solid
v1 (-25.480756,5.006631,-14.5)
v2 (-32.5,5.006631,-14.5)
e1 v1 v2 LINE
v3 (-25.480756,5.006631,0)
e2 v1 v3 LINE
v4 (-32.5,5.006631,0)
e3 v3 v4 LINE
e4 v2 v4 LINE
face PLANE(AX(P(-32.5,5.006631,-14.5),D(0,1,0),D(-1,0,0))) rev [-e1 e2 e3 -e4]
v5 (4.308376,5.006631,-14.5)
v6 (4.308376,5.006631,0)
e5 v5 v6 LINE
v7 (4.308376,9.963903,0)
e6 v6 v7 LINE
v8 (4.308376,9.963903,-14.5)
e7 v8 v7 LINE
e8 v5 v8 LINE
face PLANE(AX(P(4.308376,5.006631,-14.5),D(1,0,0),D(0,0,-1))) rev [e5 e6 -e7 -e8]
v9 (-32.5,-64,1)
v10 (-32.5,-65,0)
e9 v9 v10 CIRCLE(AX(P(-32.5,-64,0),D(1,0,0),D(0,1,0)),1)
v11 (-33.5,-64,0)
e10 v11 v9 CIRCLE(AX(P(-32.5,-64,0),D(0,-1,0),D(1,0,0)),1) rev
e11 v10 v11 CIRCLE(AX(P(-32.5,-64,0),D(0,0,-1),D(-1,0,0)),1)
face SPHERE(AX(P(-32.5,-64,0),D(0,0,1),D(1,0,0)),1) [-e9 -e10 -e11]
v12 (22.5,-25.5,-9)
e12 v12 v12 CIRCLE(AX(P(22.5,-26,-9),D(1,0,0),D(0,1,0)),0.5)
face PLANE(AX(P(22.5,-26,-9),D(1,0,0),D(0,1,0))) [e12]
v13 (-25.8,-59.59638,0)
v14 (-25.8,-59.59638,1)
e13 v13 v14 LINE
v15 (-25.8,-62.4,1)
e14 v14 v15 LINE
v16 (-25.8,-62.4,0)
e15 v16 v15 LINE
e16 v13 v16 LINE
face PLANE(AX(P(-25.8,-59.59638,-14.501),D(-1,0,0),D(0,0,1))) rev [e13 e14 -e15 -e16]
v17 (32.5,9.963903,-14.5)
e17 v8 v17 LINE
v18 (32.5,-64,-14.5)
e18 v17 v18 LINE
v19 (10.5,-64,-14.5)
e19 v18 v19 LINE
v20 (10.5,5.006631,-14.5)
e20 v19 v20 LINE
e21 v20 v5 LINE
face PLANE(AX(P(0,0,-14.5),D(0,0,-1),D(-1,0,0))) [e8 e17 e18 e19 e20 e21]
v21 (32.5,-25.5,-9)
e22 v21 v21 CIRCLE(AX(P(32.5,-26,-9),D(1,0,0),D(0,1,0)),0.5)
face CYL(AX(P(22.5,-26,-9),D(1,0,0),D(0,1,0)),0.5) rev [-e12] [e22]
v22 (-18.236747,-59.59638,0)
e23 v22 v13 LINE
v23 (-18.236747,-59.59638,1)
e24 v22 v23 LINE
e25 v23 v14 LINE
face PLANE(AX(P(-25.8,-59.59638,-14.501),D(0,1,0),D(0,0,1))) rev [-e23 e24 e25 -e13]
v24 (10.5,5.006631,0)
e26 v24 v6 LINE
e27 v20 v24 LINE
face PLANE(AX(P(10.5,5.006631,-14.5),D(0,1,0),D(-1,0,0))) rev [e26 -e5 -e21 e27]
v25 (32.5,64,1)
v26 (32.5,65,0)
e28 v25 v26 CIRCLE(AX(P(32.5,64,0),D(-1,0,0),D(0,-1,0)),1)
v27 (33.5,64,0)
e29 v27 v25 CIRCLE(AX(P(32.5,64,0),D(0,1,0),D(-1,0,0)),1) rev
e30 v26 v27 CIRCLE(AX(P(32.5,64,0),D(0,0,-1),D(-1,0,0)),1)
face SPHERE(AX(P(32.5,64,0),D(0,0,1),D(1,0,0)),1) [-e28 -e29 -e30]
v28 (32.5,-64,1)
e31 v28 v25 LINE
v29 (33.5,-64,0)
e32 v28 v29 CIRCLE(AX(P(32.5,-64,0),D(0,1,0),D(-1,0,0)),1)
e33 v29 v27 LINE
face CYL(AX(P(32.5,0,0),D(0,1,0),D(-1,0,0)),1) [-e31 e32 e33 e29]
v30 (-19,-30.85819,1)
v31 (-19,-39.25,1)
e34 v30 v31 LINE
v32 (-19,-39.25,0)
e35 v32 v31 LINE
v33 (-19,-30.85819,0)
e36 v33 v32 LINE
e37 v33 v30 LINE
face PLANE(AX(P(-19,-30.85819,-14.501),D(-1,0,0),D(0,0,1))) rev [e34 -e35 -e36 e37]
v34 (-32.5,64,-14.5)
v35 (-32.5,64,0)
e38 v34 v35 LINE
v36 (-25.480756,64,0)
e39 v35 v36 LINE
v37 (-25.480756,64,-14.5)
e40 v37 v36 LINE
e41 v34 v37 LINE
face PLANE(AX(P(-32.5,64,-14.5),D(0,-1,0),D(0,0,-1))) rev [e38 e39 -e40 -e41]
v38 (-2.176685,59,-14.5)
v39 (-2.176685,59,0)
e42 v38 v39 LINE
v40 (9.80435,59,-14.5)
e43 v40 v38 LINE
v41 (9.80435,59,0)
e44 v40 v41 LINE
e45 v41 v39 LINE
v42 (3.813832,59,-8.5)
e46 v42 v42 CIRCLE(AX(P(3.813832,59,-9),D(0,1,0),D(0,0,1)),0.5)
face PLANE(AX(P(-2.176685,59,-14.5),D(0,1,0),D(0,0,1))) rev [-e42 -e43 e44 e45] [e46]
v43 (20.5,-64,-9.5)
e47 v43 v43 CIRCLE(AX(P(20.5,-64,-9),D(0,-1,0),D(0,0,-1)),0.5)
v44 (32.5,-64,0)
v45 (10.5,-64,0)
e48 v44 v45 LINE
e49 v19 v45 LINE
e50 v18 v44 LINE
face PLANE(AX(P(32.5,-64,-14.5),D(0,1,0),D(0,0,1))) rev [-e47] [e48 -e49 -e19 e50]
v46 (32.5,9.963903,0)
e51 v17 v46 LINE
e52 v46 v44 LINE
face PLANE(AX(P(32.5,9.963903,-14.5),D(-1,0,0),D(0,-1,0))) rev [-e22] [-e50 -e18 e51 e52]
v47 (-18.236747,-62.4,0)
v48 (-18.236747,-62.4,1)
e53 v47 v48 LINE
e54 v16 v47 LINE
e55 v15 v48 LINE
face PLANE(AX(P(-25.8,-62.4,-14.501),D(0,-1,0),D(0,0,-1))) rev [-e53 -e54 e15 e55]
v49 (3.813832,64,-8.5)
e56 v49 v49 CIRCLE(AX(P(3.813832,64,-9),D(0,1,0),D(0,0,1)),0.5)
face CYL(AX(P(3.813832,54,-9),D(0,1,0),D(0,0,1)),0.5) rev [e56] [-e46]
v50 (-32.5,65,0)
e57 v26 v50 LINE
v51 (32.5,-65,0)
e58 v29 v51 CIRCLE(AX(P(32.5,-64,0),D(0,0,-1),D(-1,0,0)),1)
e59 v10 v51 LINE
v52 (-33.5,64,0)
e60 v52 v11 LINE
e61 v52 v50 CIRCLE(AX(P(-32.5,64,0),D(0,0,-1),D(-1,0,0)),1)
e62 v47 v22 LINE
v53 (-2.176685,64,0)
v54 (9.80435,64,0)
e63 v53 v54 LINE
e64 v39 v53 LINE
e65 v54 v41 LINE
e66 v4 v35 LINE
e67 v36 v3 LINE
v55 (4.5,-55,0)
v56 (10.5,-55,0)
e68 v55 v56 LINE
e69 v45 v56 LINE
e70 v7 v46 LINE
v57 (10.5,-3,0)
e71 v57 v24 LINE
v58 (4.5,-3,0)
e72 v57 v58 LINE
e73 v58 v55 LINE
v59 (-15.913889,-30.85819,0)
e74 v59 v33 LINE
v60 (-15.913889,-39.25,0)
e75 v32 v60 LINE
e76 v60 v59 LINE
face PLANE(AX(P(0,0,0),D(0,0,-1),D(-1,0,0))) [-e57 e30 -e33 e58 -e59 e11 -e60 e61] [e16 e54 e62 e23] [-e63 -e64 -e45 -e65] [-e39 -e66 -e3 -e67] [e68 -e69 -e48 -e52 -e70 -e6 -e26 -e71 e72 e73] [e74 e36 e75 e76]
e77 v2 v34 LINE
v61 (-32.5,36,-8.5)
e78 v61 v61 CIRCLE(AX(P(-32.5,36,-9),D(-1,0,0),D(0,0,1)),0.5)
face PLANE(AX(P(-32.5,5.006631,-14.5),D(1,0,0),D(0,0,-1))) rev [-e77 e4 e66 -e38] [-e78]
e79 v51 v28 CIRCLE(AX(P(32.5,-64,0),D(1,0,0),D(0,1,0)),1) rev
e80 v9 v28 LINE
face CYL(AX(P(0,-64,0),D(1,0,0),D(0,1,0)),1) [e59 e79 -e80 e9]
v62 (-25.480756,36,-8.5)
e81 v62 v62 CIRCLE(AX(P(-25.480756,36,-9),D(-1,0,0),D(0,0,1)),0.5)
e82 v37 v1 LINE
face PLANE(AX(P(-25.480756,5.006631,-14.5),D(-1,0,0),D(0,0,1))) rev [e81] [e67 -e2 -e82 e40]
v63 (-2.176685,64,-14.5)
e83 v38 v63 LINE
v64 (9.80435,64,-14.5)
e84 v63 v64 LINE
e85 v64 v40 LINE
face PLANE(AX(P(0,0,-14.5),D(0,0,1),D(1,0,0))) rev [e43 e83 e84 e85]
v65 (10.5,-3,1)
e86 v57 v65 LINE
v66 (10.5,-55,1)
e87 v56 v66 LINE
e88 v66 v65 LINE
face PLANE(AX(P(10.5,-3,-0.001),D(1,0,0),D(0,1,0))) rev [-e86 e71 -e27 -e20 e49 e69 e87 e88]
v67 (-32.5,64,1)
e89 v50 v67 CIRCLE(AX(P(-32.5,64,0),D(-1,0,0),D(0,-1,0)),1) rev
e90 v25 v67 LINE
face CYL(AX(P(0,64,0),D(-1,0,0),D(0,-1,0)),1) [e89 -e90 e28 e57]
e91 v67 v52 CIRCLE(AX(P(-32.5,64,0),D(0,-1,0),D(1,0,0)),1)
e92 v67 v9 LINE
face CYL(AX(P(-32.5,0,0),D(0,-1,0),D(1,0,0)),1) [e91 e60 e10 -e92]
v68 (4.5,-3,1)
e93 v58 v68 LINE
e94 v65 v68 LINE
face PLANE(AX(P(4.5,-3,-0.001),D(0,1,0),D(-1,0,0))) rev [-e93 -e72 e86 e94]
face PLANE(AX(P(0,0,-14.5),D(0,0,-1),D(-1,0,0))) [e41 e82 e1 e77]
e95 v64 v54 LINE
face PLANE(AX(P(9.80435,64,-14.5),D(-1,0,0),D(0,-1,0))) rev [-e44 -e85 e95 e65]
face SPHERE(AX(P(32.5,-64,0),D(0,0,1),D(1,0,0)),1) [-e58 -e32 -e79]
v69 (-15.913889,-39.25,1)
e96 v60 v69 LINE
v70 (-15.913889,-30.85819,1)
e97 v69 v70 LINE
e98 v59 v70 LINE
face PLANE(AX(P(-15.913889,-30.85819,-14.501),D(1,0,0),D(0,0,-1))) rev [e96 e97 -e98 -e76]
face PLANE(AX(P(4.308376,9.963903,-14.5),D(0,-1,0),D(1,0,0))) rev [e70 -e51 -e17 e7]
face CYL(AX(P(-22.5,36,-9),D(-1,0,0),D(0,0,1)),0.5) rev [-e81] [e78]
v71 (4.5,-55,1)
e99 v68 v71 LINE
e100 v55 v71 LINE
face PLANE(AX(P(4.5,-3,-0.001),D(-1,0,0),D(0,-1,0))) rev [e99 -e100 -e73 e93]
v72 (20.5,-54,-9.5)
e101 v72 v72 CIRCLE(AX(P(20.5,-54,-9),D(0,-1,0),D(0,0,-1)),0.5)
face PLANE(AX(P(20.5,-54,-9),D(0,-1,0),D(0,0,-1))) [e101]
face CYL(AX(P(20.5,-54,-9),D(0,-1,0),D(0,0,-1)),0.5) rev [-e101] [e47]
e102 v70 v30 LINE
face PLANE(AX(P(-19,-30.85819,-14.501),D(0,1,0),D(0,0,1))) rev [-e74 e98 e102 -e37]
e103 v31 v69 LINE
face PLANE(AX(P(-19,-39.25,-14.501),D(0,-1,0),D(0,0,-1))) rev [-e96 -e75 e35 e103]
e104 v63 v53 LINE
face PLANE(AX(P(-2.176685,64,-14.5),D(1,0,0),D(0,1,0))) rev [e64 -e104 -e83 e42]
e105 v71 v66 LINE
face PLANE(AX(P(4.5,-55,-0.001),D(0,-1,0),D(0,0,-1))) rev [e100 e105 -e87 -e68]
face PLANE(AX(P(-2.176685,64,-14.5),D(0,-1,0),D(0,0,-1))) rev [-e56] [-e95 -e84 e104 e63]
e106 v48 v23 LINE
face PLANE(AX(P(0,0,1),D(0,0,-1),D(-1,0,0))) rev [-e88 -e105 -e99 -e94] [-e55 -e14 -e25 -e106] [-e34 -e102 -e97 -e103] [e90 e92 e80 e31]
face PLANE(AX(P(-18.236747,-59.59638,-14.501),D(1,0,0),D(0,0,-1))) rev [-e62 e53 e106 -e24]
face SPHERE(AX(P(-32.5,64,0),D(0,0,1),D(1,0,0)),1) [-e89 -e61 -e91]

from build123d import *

# Parameters (mm, degrees)
SCHIZZO1_W                   = 67
SCHIZZO1_H                   = 130
ESTRUSIONE_ESTRUSIONE1_DEPTH = 1
RACCORDO1_R                  = 1
RACCORDO2_R                  = 1
TAGLIO_ESTRUSIONE1_REACH     = 75.132
SCHIZZO2_W                   = 6
SCHIZZO2_H                   = 52
SCHIZZO3_W                   = 7.019243903
SCHIZZO3_H                   = 58.993368718
SCHIZZO3_W_2                 = 11.981035511
SCHIZZO3_H_2                 = 5
ESTRUSIONE_ESTRUSIONE2_DEPTH = 14.5
TAGLIO_ESTRUSIONE3_REACH     = 76.75
SCHIZZO8_W                   = 3.086111391
SCHIZZO8_H                   = 8.391810393
TAGLIO_ESTRUSIONE4_REACH     = 76.75
SCHIZZO10_W                  = 7.563253313
SCHIZZO10_H                  = 2.803619763
SCHIZZO11_R                  = 0.5
TAGLIO_ESTRUSIONE5_DEPTH     = 10
SCHIZZO12_R                  = 0.5
TAGLIO_ESTRUSIONE6_DEPTH     = 10
SCHIZZO13_R                  = 0.5
TAGLIO_ESTRUSIONE7_DEPTH     = 10
SCHIZZO14_R                  = 0.5
TAGLIO_ESTRUSIONE8_DEPTH     = 10


# Some blends are built 0.0001 mm under size
with BuildPart() as part:
    # Schizzo1 → Estrusione-Estrusione1 (new body)
    with BuildSketch(Plane.XY):
        Rectangle(SCHIZZO1_W, SCHIZZO1_H)
    extrude(amount=ESTRUSIONE_ESTRUSIONE1_DEPTH)

    # Raccordo1
    raccordo1_edges = [part.edges().sort_by_distance(p)[0] for p in [
        (0, 65, 1),
        (33.5, 0, 1),
        (0, -65, 1),
        (-33.5, 0, 1),
    ]]
    fillet(raccordo1_edges, radius=RACCORDO1_R - 0.0001)  # a hair under: the kernel refuses the full size

    # Raccordo2
    # the kernel refuses this fillet: 1 mm, written as the material it takes off along each edge
    with BuildSketch(Plane(origin=(32.5, -64, 1), x_dir=(0, -1, 0), z_dir=(-1, 0, 0))) as raccordo2_piece_1:
        with BuildLine():
            CenterArc((0.0001, -0.9999), 0.9999, 0, 90)
            Line((1, -0.9999), (1, 0))
            Line((1, 0), (0.0001, 0))
        make_face()
    revolve(axis=Axis((32.5, -64, 1), (0, 0, 1)), revolution_arc=90, mode=Mode.SUBTRACT)
    with BuildSketch(Plane(origin=(-32.5, -64, 1), x_dir=(-1, 0, 0), z_dir=(0, 1, 0))) as raccordo2_piece_2:
        with BuildLine():
            CenterArc((0.0001, -0.9999), 0.9999, 0, 90)
            Line((1, -0.9999), (1, 0))
            Line((1, 0), (0.0001, 0))
        make_face()
    revolve(axis=Axis((-32.5, -64, 1), (0, 0, 1)), revolution_arc=90, mode=Mode.SUBTRACT)
    with BuildSketch(Plane(origin=(32.5, 64, 1), x_dir=(1, 0, 0), z_dir=(0, -1, 0))) as raccordo2_piece_3:
        with BuildLine():
            CenterArc((0.0001, -0.9999), 0.9999, 0, 90)
            Line((1, -0.9999), (1, 0))
            Line((1, 0), (0.0001, 0))
        make_face()
    revolve(axis=Axis((32.5, 64, 1), (0, 0, 1)), revolution_arc=90, mode=Mode.SUBTRACT)
    with BuildSketch(Plane(origin=(-32.5, 64, 1), x_dir=(0, 1, 0), z_dir=(1, 0, 0))) as raccordo2_piece_4:
        with BuildLine():
            CenterArc((0.0001, -0.9999), 0.9999, 0, 90)
            Line((1, -0.9999), (1, 0))
            Line((1, 0), (0.0001, 0))
        make_face()
    revolve(axis=Axis((-32.5, 64, 1), (0, 0, 1)), revolution_arc=90, mode=Mode.SUBTRACT)
    with BuildSketch(Plane(origin=(-33.5, 65, -2.5), x_dir=(1, 0, 0), z_dir=(0, 0, 1)), Plane(origin=(-33.5, -65, -2.5), x_dir=(0, 1, 0), z_dir=(0, 0, 1))) as raccordo2_piece_5:
        with BuildLine():
            CenterArc((RACCORDO2_R, -RACCORDO2_R), RACCORDO2_R, 90, 90)
            Line((0, -RACCORDO2_R), (0, 0))
            Line((0, 0), (RACCORDO2_R, 0))
        make_face()
    extrude(amount=3.5, mode=Mode.SUBTRACT)
    with BuildSketch(Plane(origin=(33.5, 65, -2.5), x_dir=(-1, 0, 0), z_dir=(0, 0, 1)), Plane(origin=(33.5, -65, -2.5), x_dir=(0, 1, 0), z_dir=(0, 0, 1))) as raccordo2_piece_6:
        with BuildLine():
            CenterArc((RACCORDO2_R, RACCORDO2_R), RACCORDO2_R, 180, 90)
            Line((0, RACCORDO2_R), (0, 0))
            Line((0, 0), (RACCORDO2_R, 0))
        make_face()
    extrude(amount=3.5, mode=Mode.SUBTRACT)

    # Schizzo2 → Taglio-Estrusione1 (cut, up to next)
    with BuildSketch(Plane.XY.offset(1), mode=Mode.PRIVATE) as taglio_estrusione1_sk1:
        with Locations((7.5, -29)):
            Rectangle(SCHIZZO2_W, SCHIZZO2_H)
    taglio_estrusione1_tool1 = extrude(taglio_estrusione1_sk1.sketch, amount=-TAGLIO_ESTRUSIONE1_REACH, mode=Mode.PRIVATE) & part.part
    add(taglio_estrusione1_tool1.solids().sort_by_distance((7.5, -29, 1))[0], mode=Mode.SUBTRACT)

    # Schizzo3 → Estrusione-Estrusione2 (add)
    with BuildSketch(Plane(origin=(0, 0, 0), x_dir=(-1, 0, 0), z_dir=(0, 0, -1))):
        Polygon((-32.5, -64), (-10.5, -64), (-10.5, 5.006631282), (-4.308376316, 5.006631282), (-4.308376316, 9.963903227), (-32.5, 9.963903227), (-32.5, 5), align=None)
        with Locations((28.990378048, 34.503315641)):
            Rectangle(SCHIZZO3_W, SCHIZZO3_H)
        with Locations((-3.813832367, 61.5)):
            Rectangle(SCHIZZO3_W_2, SCHIZZO3_H_2)
    extrude(amount=ESTRUSIONE_ESTRUSIONE2_DEPTH)

    # Schizzo8 → Taglio-Estrusione3 (cut, up to next)
    with BuildSketch(Plane.XY.offset(1), mode=Mode.PRIVATE) as taglio_estrusione3_sk1:
        with Locations((-17.456944304, -35.054094803)):
            Rectangle(SCHIZZO8_W, SCHIZZO8_H)
    taglio_estrusione3_tool1 = extrude(taglio_estrusione3_sk1.sketch, amount=-TAGLIO_ESTRUSIONE3_REACH, mode=Mode.PRIVATE) & part.part
    add(taglio_estrusione3_tool1.solids().sort_by_distance((-17.456944, -35.054095, 1))[0], mode=Mode.SUBTRACT)

    # Schizzo10 → Taglio-Estrusione4 (cut, up to next)
    with BuildSketch(Plane.XY.offset(1), mode=Mode.PRIVATE) as taglio_estrusione4_sk1:
        with Locations((-22.018373344, -60.998190119)):
            Rectangle(SCHIZZO10_W, SCHIZZO10_H)
    taglio_estrusione4_tool1 = extrude(taglio_estrusione4_sk1.sketch, amount=-TAGLIO_ESTRUSIONE4_REACH, mode=Mode.PRIVATE) & part.part
    add(taglio_estrusione4_tool1.solids().sort_by_distance((-22.018373, -60.99819, 1))[0], mode=Mode.SUBTRACT)

    # Schizzo11 → Taglio-Estrusione5 (cut)
    with BuildSketch(Plane(origin=(32.5, 0, 0), x_dir=(0, 0, -1), z_dir=(1, 0, 0))):
        with Locations(Location((9, -26, 0), (0, 0, 90))):
            Circle(SCHIZZO11_R)
    extrude(amount=-TAGLIO_ESTRUSIONE5_DEPTH, mode=Mode.SUBTRACT)

    # Schizzo12 → Taglio-Estrusione6 (cut)
    with BuildSketch(Plane(origin=(0, 64, 0), x_dir=(1, 0, 0), z_dir=(0, 1, 0))):
        with Locations(Location((3.813832367, 9, 0), (0, 0, 270))):
            Circle(SCHIZZO12_R)
    extrude(amount=-TAGLIO_ESTRUSIONE6_DEPTH, mode=Mode.SUBTRACT)

    # Schizzo13 → Taglio-Estrusione7 (cut)
    with BuildSketch(Plane.ZY.offset(32.5)):
        with Locations((-9, 36)):
            Circle(SCHIZZO13_R)
    extrude(amount=-TAGLIO_ESTRUSIONE7_DEPTH, mode=Mode.SUBTRACT)

    # Schizzo14 → Taglio-Estrusione8 (cut)
    with BuildSketch(Plane.XZ.offset(64)):
        with Locations(Location((20.5, -9, 0), (0, 0, 270))):
            Circle(SCHIZZO14_R)
    extrude(amount=-TAGLIO_ESTRUSIONE8_DEPTH, mode=Mode.SUBTRACT)


solid = part.part
